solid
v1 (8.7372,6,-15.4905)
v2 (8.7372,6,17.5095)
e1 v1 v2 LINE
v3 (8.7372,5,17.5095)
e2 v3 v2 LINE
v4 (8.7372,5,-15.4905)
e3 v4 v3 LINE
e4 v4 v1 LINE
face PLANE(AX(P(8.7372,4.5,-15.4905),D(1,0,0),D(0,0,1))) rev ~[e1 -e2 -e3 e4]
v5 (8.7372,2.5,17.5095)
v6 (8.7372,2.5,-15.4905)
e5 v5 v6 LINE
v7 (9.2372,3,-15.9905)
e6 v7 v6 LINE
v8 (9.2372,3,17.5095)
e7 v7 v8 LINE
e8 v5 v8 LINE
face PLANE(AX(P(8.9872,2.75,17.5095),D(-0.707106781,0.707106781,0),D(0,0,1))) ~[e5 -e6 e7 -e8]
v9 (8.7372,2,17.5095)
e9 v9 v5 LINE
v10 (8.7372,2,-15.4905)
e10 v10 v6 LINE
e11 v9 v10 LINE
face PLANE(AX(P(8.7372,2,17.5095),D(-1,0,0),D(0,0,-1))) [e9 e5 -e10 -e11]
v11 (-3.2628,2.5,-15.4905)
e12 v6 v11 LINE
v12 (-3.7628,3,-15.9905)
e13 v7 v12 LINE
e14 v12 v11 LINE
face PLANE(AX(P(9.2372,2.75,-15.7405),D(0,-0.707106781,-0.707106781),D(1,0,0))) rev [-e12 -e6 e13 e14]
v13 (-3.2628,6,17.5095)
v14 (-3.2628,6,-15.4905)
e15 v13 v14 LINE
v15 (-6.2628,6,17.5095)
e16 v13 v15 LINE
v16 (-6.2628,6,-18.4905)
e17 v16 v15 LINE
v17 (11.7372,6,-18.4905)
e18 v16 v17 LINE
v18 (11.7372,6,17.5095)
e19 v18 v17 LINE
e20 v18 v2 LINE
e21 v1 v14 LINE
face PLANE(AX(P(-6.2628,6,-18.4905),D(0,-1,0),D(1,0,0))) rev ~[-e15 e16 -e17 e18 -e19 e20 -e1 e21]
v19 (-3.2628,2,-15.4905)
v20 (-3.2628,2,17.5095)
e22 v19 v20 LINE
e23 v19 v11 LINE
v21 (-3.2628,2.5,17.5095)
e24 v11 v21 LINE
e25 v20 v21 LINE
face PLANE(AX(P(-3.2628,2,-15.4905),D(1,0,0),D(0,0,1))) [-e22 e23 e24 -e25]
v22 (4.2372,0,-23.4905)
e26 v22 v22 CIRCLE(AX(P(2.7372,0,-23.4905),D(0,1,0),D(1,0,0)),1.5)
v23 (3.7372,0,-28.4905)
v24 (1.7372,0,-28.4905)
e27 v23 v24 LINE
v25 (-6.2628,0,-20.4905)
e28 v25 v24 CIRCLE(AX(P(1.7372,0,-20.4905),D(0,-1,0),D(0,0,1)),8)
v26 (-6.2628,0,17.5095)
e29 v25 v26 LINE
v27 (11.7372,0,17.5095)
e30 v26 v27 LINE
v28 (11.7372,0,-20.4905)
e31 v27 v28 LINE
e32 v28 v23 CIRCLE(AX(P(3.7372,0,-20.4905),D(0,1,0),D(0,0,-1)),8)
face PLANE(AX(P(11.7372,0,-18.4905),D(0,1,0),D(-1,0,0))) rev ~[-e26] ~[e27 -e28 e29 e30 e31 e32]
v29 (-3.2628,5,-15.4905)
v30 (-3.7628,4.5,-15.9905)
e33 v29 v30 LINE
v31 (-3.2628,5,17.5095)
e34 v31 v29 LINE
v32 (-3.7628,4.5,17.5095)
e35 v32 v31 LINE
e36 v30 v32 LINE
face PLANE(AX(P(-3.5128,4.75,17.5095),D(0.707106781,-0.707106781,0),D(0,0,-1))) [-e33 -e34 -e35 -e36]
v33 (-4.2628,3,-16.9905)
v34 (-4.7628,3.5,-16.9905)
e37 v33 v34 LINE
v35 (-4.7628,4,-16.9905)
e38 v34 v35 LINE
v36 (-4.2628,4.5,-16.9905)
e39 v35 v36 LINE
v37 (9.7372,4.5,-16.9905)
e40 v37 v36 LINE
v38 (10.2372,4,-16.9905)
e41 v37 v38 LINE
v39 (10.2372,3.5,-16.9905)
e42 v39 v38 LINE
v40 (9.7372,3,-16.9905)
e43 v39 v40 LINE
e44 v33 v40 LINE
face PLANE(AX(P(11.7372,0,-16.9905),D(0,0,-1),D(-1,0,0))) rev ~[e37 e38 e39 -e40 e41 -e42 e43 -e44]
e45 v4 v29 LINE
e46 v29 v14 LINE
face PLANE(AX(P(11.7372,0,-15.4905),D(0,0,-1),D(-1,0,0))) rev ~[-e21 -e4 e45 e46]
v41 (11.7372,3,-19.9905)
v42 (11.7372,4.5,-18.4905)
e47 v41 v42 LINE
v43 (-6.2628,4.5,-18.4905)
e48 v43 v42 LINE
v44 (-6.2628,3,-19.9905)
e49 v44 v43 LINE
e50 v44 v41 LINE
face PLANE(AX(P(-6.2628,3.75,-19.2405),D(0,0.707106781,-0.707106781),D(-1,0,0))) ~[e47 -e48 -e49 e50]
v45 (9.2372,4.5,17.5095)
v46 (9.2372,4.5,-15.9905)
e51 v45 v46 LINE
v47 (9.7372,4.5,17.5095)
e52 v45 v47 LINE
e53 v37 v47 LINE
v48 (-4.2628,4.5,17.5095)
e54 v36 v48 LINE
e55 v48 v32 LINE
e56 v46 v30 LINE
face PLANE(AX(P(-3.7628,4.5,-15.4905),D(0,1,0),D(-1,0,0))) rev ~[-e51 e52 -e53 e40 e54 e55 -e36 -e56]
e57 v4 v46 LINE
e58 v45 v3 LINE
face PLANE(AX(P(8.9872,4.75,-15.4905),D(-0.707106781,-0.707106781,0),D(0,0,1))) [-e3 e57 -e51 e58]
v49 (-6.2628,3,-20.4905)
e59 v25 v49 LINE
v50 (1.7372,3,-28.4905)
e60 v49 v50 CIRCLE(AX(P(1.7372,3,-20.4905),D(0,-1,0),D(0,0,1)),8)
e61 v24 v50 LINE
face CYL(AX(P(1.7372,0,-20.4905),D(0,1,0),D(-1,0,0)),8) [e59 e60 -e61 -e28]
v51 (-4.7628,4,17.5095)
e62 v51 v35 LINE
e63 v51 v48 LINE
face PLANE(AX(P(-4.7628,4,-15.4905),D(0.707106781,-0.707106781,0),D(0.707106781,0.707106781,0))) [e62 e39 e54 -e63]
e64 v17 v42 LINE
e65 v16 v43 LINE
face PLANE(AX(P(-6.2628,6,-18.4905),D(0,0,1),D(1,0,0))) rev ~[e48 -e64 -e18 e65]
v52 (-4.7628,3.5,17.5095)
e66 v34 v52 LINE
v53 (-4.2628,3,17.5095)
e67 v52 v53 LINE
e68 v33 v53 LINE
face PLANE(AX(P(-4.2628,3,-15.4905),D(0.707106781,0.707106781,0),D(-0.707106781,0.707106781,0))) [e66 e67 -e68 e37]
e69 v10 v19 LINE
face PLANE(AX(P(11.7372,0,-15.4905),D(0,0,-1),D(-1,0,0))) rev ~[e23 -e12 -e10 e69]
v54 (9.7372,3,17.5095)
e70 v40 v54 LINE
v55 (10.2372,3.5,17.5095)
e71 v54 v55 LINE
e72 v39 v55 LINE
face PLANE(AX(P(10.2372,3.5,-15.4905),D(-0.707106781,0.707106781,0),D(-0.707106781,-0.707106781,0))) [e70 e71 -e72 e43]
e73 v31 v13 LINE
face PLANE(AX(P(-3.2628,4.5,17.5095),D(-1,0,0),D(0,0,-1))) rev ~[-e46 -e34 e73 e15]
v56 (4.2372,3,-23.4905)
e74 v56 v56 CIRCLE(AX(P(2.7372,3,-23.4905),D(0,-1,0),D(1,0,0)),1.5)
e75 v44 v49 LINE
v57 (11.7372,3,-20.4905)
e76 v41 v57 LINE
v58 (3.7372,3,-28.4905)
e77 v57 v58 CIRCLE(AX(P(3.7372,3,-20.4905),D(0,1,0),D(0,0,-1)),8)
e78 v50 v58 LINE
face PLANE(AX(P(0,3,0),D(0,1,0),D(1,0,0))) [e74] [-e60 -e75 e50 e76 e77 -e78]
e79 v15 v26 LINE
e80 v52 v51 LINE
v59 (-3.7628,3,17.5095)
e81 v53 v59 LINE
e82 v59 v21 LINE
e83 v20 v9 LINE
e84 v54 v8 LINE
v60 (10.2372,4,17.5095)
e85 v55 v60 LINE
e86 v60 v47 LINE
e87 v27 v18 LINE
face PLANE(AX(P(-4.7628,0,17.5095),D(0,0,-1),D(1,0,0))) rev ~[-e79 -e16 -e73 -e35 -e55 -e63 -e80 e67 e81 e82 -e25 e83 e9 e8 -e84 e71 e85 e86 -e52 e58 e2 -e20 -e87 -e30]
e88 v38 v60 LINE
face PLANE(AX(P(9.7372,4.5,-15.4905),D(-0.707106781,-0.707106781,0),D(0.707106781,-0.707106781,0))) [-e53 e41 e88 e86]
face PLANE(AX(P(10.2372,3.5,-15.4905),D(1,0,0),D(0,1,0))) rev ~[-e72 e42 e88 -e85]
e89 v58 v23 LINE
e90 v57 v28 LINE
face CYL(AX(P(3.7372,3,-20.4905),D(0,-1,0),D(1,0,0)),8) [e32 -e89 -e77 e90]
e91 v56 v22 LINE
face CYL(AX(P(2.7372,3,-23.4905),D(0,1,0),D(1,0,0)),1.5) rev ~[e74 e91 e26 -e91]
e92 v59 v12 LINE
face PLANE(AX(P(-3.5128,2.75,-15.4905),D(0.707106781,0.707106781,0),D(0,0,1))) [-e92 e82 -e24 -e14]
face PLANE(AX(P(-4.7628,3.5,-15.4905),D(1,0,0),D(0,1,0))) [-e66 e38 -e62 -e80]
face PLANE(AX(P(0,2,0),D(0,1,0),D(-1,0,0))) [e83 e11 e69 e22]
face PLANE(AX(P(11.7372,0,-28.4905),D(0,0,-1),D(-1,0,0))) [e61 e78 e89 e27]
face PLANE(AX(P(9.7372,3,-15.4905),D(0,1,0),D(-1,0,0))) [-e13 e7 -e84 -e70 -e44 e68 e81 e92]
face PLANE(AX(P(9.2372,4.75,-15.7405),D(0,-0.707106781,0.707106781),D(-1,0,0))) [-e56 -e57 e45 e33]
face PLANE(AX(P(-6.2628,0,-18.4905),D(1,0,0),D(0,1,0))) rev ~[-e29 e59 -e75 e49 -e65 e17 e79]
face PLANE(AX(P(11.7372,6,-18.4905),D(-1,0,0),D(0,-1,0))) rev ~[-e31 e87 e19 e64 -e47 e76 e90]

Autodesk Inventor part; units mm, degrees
ref_plane "YZ Plane" through (0, 0, 0) normal (1, 0, 0) x (0, 1, 0)
ref_plane "XZ Plane" through (0, 0, 0) normal (0, 1, 0) x (-1, 0, 0)
ref_plane "XY Plane" through (0, 0, 0) normal (0, 0, 1) x (1, 0, 0)
sketch "Sketch1" plane through (0, 0, 0) normal (0, 1, 0) x (-1, 0, 0)
  line L0 (4.2628, 17.0095) -> (-9.7372, 17.0095)
  line L1 (-9.7372, 17.0095) -> (-9.7372, -14.9905)
  line L2 (-9.7372, -14.9905) -> (4.2628, -14.9905)
  line L3 (4.2628, -14.9905) -> (4.2628, 17.0095)
  line L4 (4.7628, 17.5095) -> (-10.2372, 17.5095)
  line L5 (-10.2372, 17.5095) -> (-10.2372, -15.4905)
  line L6 (-10.2372, -15.4905) -> (4.7628, -15.4905)
  line L7 (4.7628, -15.4905) -> (4.7628, 17.5095)
  point P0 (0, 0)
  dimension "d0" = 14
  dimension "d1" = 32
  dimension "d2" = 0.5
extrude "Extrusion1" add sketch "Sketch1" along normal blind 2 contours L3 L2 L1 L0 | L7 L6 L5 L4
sketch "Sketch2" plane through (0, 2, 0) normal (0, 1, 0) x (1, 0, 0)
  line L0 (-4.7628, 15.4905) -> (-4.7628, -17.5095) projected
  line L1 (10.2372, -17.5095) -> (10.2372, 15.4905) projected
  line L2 (-3.2628, 15.4905) -> (-3.2628, -17.5095)
  line L3 (8.7372, -17.5095) -> (8.7372, 15.4905)
  line L4 (-3.2628, -17.5095) -> (-6.2628, -17.5095)
  line L5 (-6.2628, -17.5095) -> (-6.2628, 15.4905)
  line L6 (-6.2628, 15.4905) -> (-3.2628, 15.4905)
  line L7 (-3.2628, 15.4905) -> (-3.2628, -17.5095)
  line L8 (8.7372, -17.5095) -> (11.7372, -17.5095)
  line L9 (11.7372, -17.5095) -> (11.7372, 15.4905)
  line L10 (11.7372, 15.4905) -> (8.7372, 15.4905)
  line L11 (8.7372, 15.4905) -> (8.7372, -17.5095)
  point P0 (0, 0)
  dimension "d5" = 1.5
  dimension "d6" = 1.5
  dimension "d7" = 3
  dimension "d8" = 3
extrude "Extrusion2" add sketch "Sketch2" along normal blind 1
sketch "Sketch3" plane through (0, 3, 0) normal (0, 1, 0) x (1, 0, 0)
  line L0 (-6.2628, 15.4905) -> (-6.2628, -17.5095) projected
  line L1 (11.7372, -17.5095) -> (11.7372, 15.4905) projected
  line L2 (-6.2628, -17.5095) -> (-4.7628, -17.5095) projected
  line L3 (-3.2628, 15.4905) -> (-6.2628, 15.4905) projected
  line L4 (-6.2628, -17.5095) -> (-4.7628, -17.5095)
  line L5 (-4.7628, -17.5095) -> (-4.7628, 15.4905)
  line L6 (-4.7628, 15.4905) -> (-6.2628, 15.4905)
  line L7 (-6.2628, 15.4905) -> (-6.2628, -17.5095)
  line L8 (10.2372, -17.5095) -> (10.2372, 15.4905) projected
  line L9 (11.7372, -17.5095) -> (10.2372, -17.5095)
  line L10 (10.2372, -17.5095) -> (10.2372, 15.4905)
  line L11 (10.2372, 15.4905) -> (11.7372, 15.4905)
  line L12 (11.7372, 15.4905) -> (11.7372, -17.5095)
  point P0 (0, 0)
extrude "Extrusion3" add sketch "Sketch3" along normal blind 1.5
sketch "Sketch4" plane through (0, 4.5, 0) normal (0, 1, 0) x (1, 0, 0)
  line L0 (-4.7628, 15.4905) -> (-6.2628, 15.4905) projected
  line L1 (-6.2628, 15.4905) -> (-6.2628, -17.5095) projected
  line L2 (-6.2628, -17.5095) -> (-4.7628, -17.5095) projected
  line L3 (-4.7628, -17.5095) -> (-4.7628, 15.4905) projected
  line L4 (11.7372, -17.5095) -> (11.7372, 15.4905) projected
  line L5 (11.7372, 15.4905) -> (10.2372, 15.4905) projected
  line L6 (10.2372, 15.4905) -> (10.2372, -17.5095) projected
  line L7 (10.2372, -17.5095) -> (11.7372, -17.5095) projected
  line L8 (8.7372, 15.4905) -> (8.7372, -17.5095) projected
  line L9 (-3.2628, -17.5095) -> (-3.2628, 15.4905) projected
  line L10 (8.7372, 15.4905) -> (-3.2628, 15.4905) projected
  line L11 (-6.2628, -17.5095) -> (-3.2628, -17.5095)
  line L12 (-3.2628, -17.5095) -> (-3.2628, 15.4905)
  line L13 (-3.2628, 15.4905) -> (-6.2628, 15.4905)
  line L14 (-6.2628, 15.4905) -> (-6.2628, -17.5095)
  line L15 (11.7372, -17.5095) -> (8.7372, -17.5095)
  line L16 (8.7372, -17.5095) -> (8.7372, 15.4905)
  line L17 (8.7372, 15.4905) -> (11.7372, 15.4905)
  line L18 (11.7372, 15.4905) -> (11.7372, -17.5095)
  point P0 (0, 0)
extrude "Extrusion4" add sketch "Sketch4" along normal blind 1.5
chamfer "Chamfer1" distance 0.5 angle 45 4 edges at (-3.2628, 3, 1.0095) (8.7372, 3, 1.0095) (10.2372, 3, 1.0095) (-4.7628, 3, 1.0095)
chamfer "Chamfer2" distance 0.5 angle 45 4 edges at (-4.7628, 4.5, 1.0095) (10.2372, 4.5, 1.0095) (8.7372, 4.5, 1.0095) (-3.2628, 4.5, 1.0095)
sketch "Sketch5" plane through (0, 2, 0) normal (0, -1, 0) x (1, 0, 0)
  line L0 (-4.7628, -15.4905) -> (-4.7628, 17.5095) projected
  line L1 (-6.2628, 17.5095) -> (-4.7628, 17.5095) projected
  line L2 (-6.2628, -15.4905) -> (-6.2628, 17.5095) projected
  line L3 (-4.7628, -15.4905) -> (-6.2628, -15.4905) projected
  line L4 (10.2372, 17.5095) -> (10.2372, -15.4905) projected
  line L5 (11.7372, -15.4905) -> (10.2372, -15.4905) projected
  line L6 (11.7372, 17.5095) -> (11.7372, -15.4905) projected
  line L7 (10.2372, 17.5095) -> (11.7372, 17.5095) projected
  point P0 (0, 0)
extrude "Extrusion5" add sketch "Sketch5" along normal up to surface (2 mm away)
sketch "Sketch6" plane through (11.7372, 0, -15.4905) normal (0, 0, -1) x (-1, 0, 0)
  line L0 (0, 0) -> (0, 6) projected
  line L1 (18, 0) -> (0, 0) projected
  line L2 (0, 6) -> (3, 6) projected
  line L3 (15, 6) -> (18, 6) projected
  line L4 (18, 0) -> (18, 6) projected
  line L5 (16.5, 4) -> (16, 4.5) projected
  line L6 (15.5, 4.5) -> (16, 4.5) projected
  line L7 (16.5, 3.5) -> (16.5, 4) projected
  line L8 (16, 3) -> (16.5, 3.5) projected
  line L9 (15.5, 3) -> (16, 3) projected
  line L10 (2, 3) -> (2.5, 3) projected
  line L11 (1.5, 3.5) -> (2, 3) projected
  line L12 (1.5, 3.5) -> (1.5, 4) projected
  line L13 (2, 4.5) -> (1.5, 4) projected
  line L14 (2, 4.5) -> (2.5, 4.5) projected
  line L15 (2.5, 4.5) -> (15.5, 4.5)
  line L16 (3, 2.5) -> (2.5, 3) projected
  line L17 (15, 2.5) -> (15.5, 3) projected
  line L18 (2.5, 3) -> (15.5, 3)
  line L19 (3, 5) -> (3, 6) projected
  line L20 (15, 5) -> (15, 6) projected
  line L21 (3, 6) -> (15, 6)
  point P0 (11.7372, 0)
extrude "Extrusion6" add sketch "Sketch6" along normal blind 1.5
sketch "Sketch7" plane through (11.7372, 0, -16.9905) normal (0, 0, -1) x (-1, 0, 0)
  line L0 (0, 6) -> (0, 0) projected
  line L1 (0, 0) -> (18, 0) projected
  line L2 (18, 6) -> (18, 0) projected
  line L3 (0, 6) -> (18, 6)
  line L4 (18, 6) -> (18, 0)
  line L5 (18, 0) -> (0, 0)
  line L6 (0, 0) -> (0, 6)
  point P0 (11.7372, 0)
extrude "Extrusion7" add sketch "Sketch7" along normal blind 1.5
chamfer "Chamfer3" distance 0.5 angle 45 2 edges at (2.7372, 3, -15.4905) (2.7372, 4.5, -15.4905)
sketch "Sketch8" plane through (11.7372, 0, -18.4905) normal (0, 0, -1) x (-1, 0, 0)
  line L0 (0, 6) -> (0, 0) projected
  line L1 (0, 0) -> (18, 0) projected
  line L2 (18, 0) -> (18, 6) projected
  line L3 (18, 6) -> (0, 6) projected
  point P0 (11.7372, 0)
extrude "Extrusion8" add sketch "Sketch8" along normal blind 10
sketch "Sketch9" plane through (0, 6, 0) normal (0, 1, 0) x (1, 0, 0)
  line L0 (-6.2628, 28.4905) -> (11.7372, 28.4905) projected
  line L1 (-6.2628, -17.5095) -> (-6.2628, 28.4905) projected
  line L2 (11.7372, 28.4905) -> (-6.2628, 28.4905)
  line L3 (-6.2628, 28.4905) -> (-6.2628, 18.4905)
  line L4 (-6.2628, 18.4905) -> (11.7372, 18.4905)
  line L5 (11.7372, 18.4905) -> (11.7372, 28.4905)
  point P0 (0, 0)
  dimension "d32" = 10
extrude "Extrusion9" cut sketch "Sketch9" against normal blind 3
sketch "Sketch10" plane through (0, 3, 0) normal (0, 1, 0) x (1, 0, 0)
  line L0 (11.7372, 28.4905) -> (11.7372, 18.4905) projected
  line L1 (-6.2628, 18.4905) -> (-6.2628, 28.4905) projected
  line L2 (11.7372, 18.4905) -> (-6.2628, 18.4905) projected
  line L3 (11.7372, 28.4905) -> (-6.2628, 18.4905)
  circle A0 centre (2.7372, 23.4905) radius 1.5
  point P0 (0, 0)
  dimension "d35" = 3
extrude "Extrusion10" cut sketch "Sketch10" against normal blind 3 contours A0 L3 | L3 A0
fillet "Fillet1" radius 8 2 edges at (-6.2628, 1.5, -28.4905) (11.7372, 1.5, -28.4905)
chamfer "Chamfer4" distance 1.5 angle 45 1 edges at (2.7372, 3, -18.4905)
properties part number "RC_Snubber_3DPrint"
